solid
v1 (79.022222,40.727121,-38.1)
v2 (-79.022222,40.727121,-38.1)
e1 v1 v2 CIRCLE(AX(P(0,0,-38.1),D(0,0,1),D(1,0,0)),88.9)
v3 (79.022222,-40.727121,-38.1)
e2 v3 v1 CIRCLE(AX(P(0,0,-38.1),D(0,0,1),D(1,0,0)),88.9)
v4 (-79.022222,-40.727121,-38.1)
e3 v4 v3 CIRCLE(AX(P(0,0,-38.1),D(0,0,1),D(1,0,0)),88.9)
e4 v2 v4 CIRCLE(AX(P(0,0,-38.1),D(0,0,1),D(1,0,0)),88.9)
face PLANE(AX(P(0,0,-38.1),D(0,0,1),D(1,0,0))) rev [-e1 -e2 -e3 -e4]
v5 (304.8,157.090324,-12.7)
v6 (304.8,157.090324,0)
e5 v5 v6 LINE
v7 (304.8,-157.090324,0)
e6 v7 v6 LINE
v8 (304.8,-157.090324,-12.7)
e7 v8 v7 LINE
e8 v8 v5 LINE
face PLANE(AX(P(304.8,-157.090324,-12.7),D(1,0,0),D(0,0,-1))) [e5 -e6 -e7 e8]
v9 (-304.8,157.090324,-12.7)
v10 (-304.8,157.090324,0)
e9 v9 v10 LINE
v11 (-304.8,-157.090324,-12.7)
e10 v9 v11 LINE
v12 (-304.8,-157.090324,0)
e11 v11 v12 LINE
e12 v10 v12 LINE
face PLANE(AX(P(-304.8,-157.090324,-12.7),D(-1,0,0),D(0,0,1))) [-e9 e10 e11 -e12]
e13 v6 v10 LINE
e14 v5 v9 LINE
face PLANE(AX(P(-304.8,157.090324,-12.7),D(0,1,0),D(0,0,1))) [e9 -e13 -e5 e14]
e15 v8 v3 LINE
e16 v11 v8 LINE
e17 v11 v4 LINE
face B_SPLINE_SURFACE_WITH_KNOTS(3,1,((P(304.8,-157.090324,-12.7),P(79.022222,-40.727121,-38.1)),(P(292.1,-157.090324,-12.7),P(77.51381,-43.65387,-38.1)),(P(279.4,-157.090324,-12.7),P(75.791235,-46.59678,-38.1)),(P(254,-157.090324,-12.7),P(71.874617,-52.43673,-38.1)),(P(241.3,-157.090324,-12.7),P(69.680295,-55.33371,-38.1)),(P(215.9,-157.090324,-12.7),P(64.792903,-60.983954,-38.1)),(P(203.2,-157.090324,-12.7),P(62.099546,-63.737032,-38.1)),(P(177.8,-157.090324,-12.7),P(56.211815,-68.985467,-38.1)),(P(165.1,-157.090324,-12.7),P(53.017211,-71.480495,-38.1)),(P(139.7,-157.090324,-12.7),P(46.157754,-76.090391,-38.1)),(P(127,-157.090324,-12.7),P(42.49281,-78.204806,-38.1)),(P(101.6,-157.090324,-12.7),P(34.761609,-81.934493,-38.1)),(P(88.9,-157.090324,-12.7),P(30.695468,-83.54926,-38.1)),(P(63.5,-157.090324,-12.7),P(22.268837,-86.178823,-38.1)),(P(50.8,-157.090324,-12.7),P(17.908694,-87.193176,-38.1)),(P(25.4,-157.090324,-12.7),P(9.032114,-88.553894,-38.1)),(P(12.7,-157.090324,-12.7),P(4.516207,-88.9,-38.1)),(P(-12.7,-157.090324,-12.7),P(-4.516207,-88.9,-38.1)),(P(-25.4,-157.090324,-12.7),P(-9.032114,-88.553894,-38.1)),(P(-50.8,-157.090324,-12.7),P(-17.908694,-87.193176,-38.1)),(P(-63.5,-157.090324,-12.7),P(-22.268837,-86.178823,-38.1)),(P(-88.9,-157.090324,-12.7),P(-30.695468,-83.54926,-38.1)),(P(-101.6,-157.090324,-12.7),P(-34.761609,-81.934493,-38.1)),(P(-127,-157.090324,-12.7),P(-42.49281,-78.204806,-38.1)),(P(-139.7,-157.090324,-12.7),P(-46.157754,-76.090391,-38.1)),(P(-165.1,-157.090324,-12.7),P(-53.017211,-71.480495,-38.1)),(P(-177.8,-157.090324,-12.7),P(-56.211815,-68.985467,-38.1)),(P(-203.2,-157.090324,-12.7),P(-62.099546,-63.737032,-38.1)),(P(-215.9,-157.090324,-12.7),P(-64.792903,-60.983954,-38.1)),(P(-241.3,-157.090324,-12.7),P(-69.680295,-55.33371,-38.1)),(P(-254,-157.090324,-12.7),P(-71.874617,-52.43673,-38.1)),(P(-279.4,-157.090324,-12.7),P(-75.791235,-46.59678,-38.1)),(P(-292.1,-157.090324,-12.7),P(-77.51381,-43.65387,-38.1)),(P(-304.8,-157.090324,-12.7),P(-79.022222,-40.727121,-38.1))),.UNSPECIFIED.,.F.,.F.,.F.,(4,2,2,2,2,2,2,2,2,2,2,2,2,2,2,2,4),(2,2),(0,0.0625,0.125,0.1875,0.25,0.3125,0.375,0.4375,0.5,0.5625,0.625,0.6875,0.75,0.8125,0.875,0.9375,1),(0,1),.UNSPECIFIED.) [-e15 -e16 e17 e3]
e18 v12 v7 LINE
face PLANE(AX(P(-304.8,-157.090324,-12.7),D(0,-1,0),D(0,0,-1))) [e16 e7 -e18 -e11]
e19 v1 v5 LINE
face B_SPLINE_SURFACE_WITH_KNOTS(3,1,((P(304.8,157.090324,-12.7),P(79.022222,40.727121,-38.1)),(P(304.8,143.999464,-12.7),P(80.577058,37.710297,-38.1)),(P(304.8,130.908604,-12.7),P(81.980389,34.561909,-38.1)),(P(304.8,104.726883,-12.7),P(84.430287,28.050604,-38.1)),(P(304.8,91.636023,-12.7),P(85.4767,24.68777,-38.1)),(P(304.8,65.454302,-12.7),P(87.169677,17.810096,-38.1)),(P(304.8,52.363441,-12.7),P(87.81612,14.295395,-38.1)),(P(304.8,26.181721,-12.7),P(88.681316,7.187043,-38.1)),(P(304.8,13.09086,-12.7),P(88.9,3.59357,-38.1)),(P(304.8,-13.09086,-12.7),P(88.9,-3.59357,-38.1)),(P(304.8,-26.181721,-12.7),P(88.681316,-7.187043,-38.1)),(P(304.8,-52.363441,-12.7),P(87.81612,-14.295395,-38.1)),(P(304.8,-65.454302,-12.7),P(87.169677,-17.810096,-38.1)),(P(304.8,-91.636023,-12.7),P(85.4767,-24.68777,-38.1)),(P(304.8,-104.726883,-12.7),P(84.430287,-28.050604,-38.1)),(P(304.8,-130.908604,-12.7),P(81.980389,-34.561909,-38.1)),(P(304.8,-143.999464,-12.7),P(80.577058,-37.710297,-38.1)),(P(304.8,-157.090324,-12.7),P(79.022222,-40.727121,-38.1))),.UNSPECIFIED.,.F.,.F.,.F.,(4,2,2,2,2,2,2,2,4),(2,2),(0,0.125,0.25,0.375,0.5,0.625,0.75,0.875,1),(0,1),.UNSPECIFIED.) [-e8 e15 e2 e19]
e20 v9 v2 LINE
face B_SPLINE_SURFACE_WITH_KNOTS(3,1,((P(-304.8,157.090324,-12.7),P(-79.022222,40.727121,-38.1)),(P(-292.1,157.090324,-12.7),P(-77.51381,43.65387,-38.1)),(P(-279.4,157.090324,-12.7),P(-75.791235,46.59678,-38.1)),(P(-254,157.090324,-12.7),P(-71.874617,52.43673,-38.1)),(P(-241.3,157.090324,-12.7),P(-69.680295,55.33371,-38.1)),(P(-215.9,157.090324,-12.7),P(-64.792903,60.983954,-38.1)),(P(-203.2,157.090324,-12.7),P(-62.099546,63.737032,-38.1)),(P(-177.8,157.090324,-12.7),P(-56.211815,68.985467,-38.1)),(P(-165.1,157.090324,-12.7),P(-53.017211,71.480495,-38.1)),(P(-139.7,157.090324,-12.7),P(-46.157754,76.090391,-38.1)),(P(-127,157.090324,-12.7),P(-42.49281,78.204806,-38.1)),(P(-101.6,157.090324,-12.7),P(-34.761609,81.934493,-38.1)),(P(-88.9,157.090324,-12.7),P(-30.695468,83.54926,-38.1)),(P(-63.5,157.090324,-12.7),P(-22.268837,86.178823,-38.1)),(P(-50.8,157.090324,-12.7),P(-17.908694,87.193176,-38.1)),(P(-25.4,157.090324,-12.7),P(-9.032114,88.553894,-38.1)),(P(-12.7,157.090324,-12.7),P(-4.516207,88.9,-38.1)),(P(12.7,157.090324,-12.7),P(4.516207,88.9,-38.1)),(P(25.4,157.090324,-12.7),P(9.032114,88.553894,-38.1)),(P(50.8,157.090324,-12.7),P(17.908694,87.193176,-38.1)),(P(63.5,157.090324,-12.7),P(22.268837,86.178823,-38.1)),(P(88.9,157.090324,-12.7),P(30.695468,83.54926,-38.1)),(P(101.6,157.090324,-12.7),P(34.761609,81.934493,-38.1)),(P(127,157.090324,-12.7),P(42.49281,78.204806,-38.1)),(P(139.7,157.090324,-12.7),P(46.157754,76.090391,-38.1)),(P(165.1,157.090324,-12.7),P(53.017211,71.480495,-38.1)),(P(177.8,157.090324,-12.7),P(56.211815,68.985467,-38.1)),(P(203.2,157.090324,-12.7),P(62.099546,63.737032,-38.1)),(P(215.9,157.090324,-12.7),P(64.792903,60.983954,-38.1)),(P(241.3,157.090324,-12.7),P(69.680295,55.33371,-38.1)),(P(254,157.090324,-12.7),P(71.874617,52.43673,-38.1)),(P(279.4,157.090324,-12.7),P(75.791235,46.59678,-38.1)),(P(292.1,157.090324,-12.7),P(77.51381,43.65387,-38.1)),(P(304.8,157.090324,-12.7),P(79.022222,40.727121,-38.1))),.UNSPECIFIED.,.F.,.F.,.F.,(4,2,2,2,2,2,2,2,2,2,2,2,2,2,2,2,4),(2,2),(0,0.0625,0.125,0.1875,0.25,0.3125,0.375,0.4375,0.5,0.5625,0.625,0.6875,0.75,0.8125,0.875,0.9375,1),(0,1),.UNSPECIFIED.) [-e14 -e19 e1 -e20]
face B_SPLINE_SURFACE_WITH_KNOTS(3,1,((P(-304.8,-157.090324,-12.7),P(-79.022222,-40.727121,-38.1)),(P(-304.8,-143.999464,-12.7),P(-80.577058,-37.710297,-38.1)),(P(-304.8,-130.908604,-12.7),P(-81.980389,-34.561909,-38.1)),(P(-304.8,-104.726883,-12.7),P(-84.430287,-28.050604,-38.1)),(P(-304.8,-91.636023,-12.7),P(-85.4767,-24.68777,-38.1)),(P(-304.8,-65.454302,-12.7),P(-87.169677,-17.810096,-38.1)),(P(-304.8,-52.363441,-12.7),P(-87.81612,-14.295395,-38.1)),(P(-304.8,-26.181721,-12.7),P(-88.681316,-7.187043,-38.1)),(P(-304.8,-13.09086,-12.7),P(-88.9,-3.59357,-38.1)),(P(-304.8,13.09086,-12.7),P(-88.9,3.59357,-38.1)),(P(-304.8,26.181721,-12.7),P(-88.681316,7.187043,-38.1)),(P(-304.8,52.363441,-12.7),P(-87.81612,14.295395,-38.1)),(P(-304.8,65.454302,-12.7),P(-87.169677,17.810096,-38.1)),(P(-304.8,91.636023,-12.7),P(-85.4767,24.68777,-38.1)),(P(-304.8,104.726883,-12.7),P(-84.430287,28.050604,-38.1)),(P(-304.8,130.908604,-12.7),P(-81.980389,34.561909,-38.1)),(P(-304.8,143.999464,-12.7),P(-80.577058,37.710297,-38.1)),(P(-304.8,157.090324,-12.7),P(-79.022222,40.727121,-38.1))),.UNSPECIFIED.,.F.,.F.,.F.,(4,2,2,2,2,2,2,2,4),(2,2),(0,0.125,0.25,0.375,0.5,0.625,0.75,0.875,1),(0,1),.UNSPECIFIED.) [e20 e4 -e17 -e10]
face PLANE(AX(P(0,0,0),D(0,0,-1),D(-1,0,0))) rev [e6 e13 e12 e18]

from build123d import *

# Parameters (mm, degrees)
SKETCH1_W           = 609.6
SKETCH1_H           = 314.180648672
BOSS_EXTRUDE1_DEPTH = 12.7


with BuildPart() as part:
    # Sketch1 → Boss-Extrude1 (new body)
    with BuildSketch(Plane.XY):
        Rectangle(SKETCH1_W, SKETCH1_H)
    extrude(amount=-BOSS_EXTRUDE1_DEPTH)

    # Loft1: read off the stored shape, not the designer's step
    # Loft1: loft between two sections, ruled curve by curve
    loft1_from = [
        Edge.make_bspline([(304.8, 157.090324336, -12.7), (304.8, 143.999463975, -12.7), (304.8, 130.908603613, -12.7), (304.8, 104.726882891, -12.7), (304.8, 91.636022529, -12.7), (304.8, 65.454301807, -12.7), (304.8, 52.363441445, -12.7), (304.8, 26.181720723, -12.7), (304.8, 13.090860361, -12.7), (304.8, -13.090860361, -12.7), (304.8, -26.181720723, -12.7), (304.8, -52.363441445, -12.7), (304.8, -65.454301807, -12.7), (304.8, -91.636022529, -12.7), (304.8, -104.726882891, -12.7), (304.8, -130.908603613, -12.7), (304.8, -143.999463975, -12.7), (304.8, -157.090324336, -12.7)], [0, 0, 0, 0, 0.125, 0.125, 0.25, 0.25, 0.375, 0.375, 0.5, 0.5, 0.625, 0.625, 0.75, 0.75, 0.875, 0.875, 1, 1, 1, 1], 3),
        Edge.make_bspline([(304.8, -157.090324336, -12.7), (292.1, -157.090324336, -12.7), (279.4, -157.090324336, -12.7), (254, -157.090324336, -12.7), (241.3, -157.090324336, -12.7), (215.9, -157.090324336, -12.7), (203.2, -157.090324336, -12.7), (177.8, -157.090324336, -12.7), (165.1, -157.090324336, -12.7), (139.7, -157.090324336, -12.7), (127, -157.090324336, -12.7), (101.6, -157.090324336, -12.7), (88.9, -157.090324336, -12.7), (63.5, -157.090324336, -12.7), (50.8, -157.090324336, -12.7), (25.4, -157.090324336, -12.7), (12.7, -157.090324336, -12.7), (-12.7, -157.090324336, -12.7), (-25.4, -157.090324336, -12.7), (-50.8, -157.090324336, -12.7), (-63.5, -157.090324336, -12.7), (-88.9, -157.090324336, -12.7), (-101.6, -157.090324336, -12.7), (-127, -157.090324336, -12.7), (-139.7, -157.090324336, -12.7), (-165.1, -157.090324336, -12.7), (-177.8, -157.090324336, -12.7), (-203.2, -157.090324336, -12.7), (-215.9, -157.090324336, -12.7), (-241.3, -157.090324336, -12.7), (-254, -157.090324336, -12.7), (-279.4, -157.090324336, -12.7), (-292.1, -157.090324336, -12.7), (-304.8, -157.090324336, -12.7)], [0, 0, 0, 0, 0.0625, 0.0625, 0.125, 0.125, 0.1875, 0.1875, 0.25, 0.25, 0.3125, 0.3125, 0.375, 0.375, 0.4375, 0.4375, 0.5, 0.5, 0.5625, 0.5625, 0.625, 0.625, 0.6875, 0.6875, 0.75, 0.75, 0.8125, 0.8125, 0.875, 0.875, 0.9375, 0.9375, 1, 1, 1, 1], 3),
        Edge.make_bspline([(-304.8, 157.090324336, -12.7), (-292.1, 157.090324336, -12.7), (-279.4, 157.090324336, -12.7), (-254, 157.090324336, -12.7), (-241.3, 157.090324336, -12.7), (-215.9, 157.090324336, -12.7), (-203.2, 157.090324336, -12.7), (-177.8, 157.090324336, -12.7), (-165.1, 157.090324336, -12.7), (-139.7, 157.090324336, -12.7), (-127, 157.090324336, -12.7), (-101.6, 157.090324336, -12.7), (-88.9, 157.090324336, -12.7), (-63.5, 157.090324336, -12.7), (-50.8, 157.090324336, -12.7), (-25.4, 157.090324336, -12.7), (-12.7, 157.090324336, -12.7), (12.7, 157.090324336, -12.7), (25.4, 157.090324336, -12.7), (50.8, 157.090324336, -12.7), (63.5, 157.090324336, -12.7), (88.9, 157.090324336, -12.7), (101.6, 157.090324336, -12.7), (127, 157.090324336, -12.7), (139.7, 157.090324336, -12.7), (165.1, 157.090324336, -12.7), (177.8, 157.090324336, -12.7), (203.2, 157.090324336, -12.7), (215.9, 157.090324336, -12.7), (241.3, 157.090324336, -12.7), (254, 157.090324336, -12.7), (279.4, 157.090324336, -12.7), (292.1, 157.090324336, -12.7), (304.8, 157.090324336, -12.7)], [0, 0, 0, 0, 0.0625, 0.0625, 0.125, 0.125, 0.1875, 0.1875, 0.25, 0.25, 0.3125, 0.3125, 0.375, 0.375, 0.4375, 0.4375, 0.5, 0.5, 0.5625, 0.5625, 0.625, 0.625, 0.6875, 0.6875, 0.75, 0.75, 0.8125, 0.8125, 0.875, 0.875, 0.9375, 0.9375, 1, 1, 1, 1], 3),
        Edge.make_bspline([(-304.8, -157.090324336, -12.7), (-304.8, -143.999463975, -12.7), (-304.8, -130.908603613, -12.7), (-304.8, -104.726882891, -12.7), (-304.8, -91.636022529, -12.7), (-304.8, -65.454301807, -12.7), (-304.8, -52.363441445, -12.7), (-304.8, -26.181720723, -12.7), (-304.8, -13.090860361, -12.7), (-304.8, 13.090860361, -12.7), (-304.8, 26.181720723, -12.7), (-304.8, 52.363441445, -12.7), (-304.8, 65.454301807, -12.7), (-304.8, 91.636022529, -12.7), (-304.8, 104.726882891, -12.7), (-304.8, 130.908603613, -12.7), (-304.8, 143.999463975, -12.7), (-304.8, 157.090324336, -12.7)], [0, 0, 0, 0, 0.125, 0.125, 0.25, 0.25, 0.375, 0.375, 0.5, 0.5, 0.625, 0.625, 0.75, 0.75, 0.875, 0.875, 1, 1, 1, 1], 3),
    ]
    loft1_to = [
        Edge.make_bspline([(79.022222222, 40.727121124, -38.1), (80.577057613, 37.710297337, -38.1), (81.980389053, 34.561909453, -38.1), (84.430287104, 28.050604162, -38.1), (85.476699573, 24.687769705, -38.1), (87.169677239, 17.810095816, -38.1), (87.816120347, 14.295394928, -38.1), (88.681315551, 7.187042588, -38.1), (88.9, 3.593569511, -38.1), (88.9, -3.593569511, -38.1), (88.681315551, -7.187042588, -38.1), (87.816120347, -14.295394928, -38.1), (87.169677239, -17.810095816, -38.1), (85.476699573, -24.687769705, -38.1), (84.430287104, -28.050604162, -38.1), (81.980389053, -34.561909453, -38.1), (80.577057613, -37.710297337, -38.1), (79.022222222, -40.727121124, -38.1)], [0, 0, 0, 0, 0.125, 0.125, 0.25, 0.25, 0.375, 0.375, 0.5, 0.5, 0.625, 0.625, 0.75, 0.75, 0.875, 0.875, 1, 1, 1, 1], 3),
        Edge.make_bspline([(79.022222222, -40.727121124, -38.1), (77.513810329, -43.653870095, -38.1), (75.79123489, -46.596780367, -38.1), (71.874617054, -52.43672997, -38.1), (69.680294943, -55.333709982, -38.1), (64.792903277, -60.983954027, -38.1), (62.099546472, -63.737031565, -38.1), (56.211815103, -68.985467365, -38.1), (53.017211054, -71.480494923, -38.1), (46.157754062, -76.090390736, -38.1), (42.492809932, -78.204805568, -38.1), (34.761608604, -81.934492597, -38.1), (30.695467957, -83.549260467, -38.1), (22.268836934, -86.178823265, -38.1), (17.908694381, -87.193176196, -38.1), (9.032113746, -88.553894498, -38.1), (4.516207395, -88.9, -38.1), (-4.516207395, -88.9, -38.1), (-9.032113746, -88.553894498, -38.1), (-17.908694381, -87.193176196, -38.1), (-22.268836934, -86.178823265, -38.1), (-30.695467957, -83.549260467, -38.1), (-34.761608604, -81.934492597, -38.1), (-42.492809932, -78.204805568, -38.1), (-46.157754062, -76.090390736, -38.1), (-53.017211054, -71.480494923, -38.1), (-56.211815103, -68.985467365, -38.1), (-62.099546472, -63.737031565, -38.1), (-64.792903277, -60.983954027, -38.1), (-69.680294943, -55.333709982, -38.1), (-71.874617054, -52.43672997, -38.1), (-75.79123489, -46.596780367, -38.1), (-77.513810329, -43.653870095, -38.1), (-79.022222222, -40.727121124, -38.1)], [0, 0, 0, 0, 0.0625, 0.0625, 0.125, 0.125, 0.1875, 0.1875, 0.25, 0.25, 0.3125, 0.3125, 0.375, 0.375, 0.4375, 0.4375, 0.5, 0.5, 0.5625, 0.5625, 0.625, 0.625, 0.6875, 0.6875, 0.75, 0.75, 0.8125, 0.8125, 0.875, 0.875, 0.9375, 0.9375, 1, 1, 1, 1], 3),
        Edge.make_bspline([(-79.022222222, 40.727121124, -38.1), (-77.513810329, 43.653870095, -38.1), (-75.79123489, 46.596780367, -38.1), (-71.874617054, 52.43672997, -38.1), (-69.680294943, 55.333709982, -38.1), (-64.792903277, 60.983954027, -38.1), (-62.099546472, 63.737031565, -38.1), (-56.211815103, 68.985467365, -38.1), (-53.017211054, 71.480494923, -38.1), (-46.157754062, 76.090390736, -38.1), (-42.492809932, 78.204805568, -38.1), (-34.761608604, 81.934492597, -38.1), (-30.695467957, 83.549260467, -38.1), (-22.268836934, 86.178823265, -38.1), (-17.908694381, 87.193176196, -38.1), (-9.032113746, 88.553894498, -38.1), (-4.516207395, 88.9, -38.1), (4.516207395, 88.9, -38.1), (9.032113746, 88.553894498, -38.1), (17.908694381, 87.193176196, -38.1), (22.268836934, 86.178823265, -38.1), (30.695467957, 83.549260467, -38.1), (34.761608604, 81.934492597, -38.1), (42.492809932, 78.204805568, -38.1), (46.157754062, 76.090390736, -38.1), (53.017211054, 71.480494923, -38.1), (56.211815103, 68.985467365, -38.1), (62.099546472, 63.737031565, -38.1), (64.792903277, 60.983954027, -38.1), (69.680294943, 55.333709982, -38.1), (71.874617054, 52.43672997, -38.1), (75.79123489, 46.596780367, -38.1), (77.513810329, 43.653870095, -38.1), (79.022222222, 40.727121124, -38.1)], [0, 0, 0, 0, 0.0625, 0.0625, 0.125, 0.125, 0.1875, 0.1875, 0.25, 0.25, 0.3125, 0.3125, 0.375, 0.375, 0.4375, 0.4375, 0.5, 0.5, 0.5625, 0.5625, 0.625, 0.625, 0.6875, 0.6875, 0.75, 0.75, 0.8125, 0.8125, 0.875, 0.875, 0.9375, 0.9375, 1, 1, 1, 1], 3),
        Edge.make_bspline([(-79.022222222, -40.727121124, -38.1), (-80.577057613, -37.710297337, -38.1), (-81.980389053, -34.561909453, -38.1), (-84.430287104, -28.050604162, -38.1), (-85.476699573, -24.687769705, -38.1), (-87.169677239, -17.810095816, -38.1), (-87.816120347, -14.295394928, -38.1), (-88.681315551, -7.187042588, -38.1), (-88.9, -3.593569511, -38.1), (-88.9, 3.593569511, -38.1), (-88.681315551, 7.187042588, -38.1), (-87.816120347, 14.295394928, -38.1), (-87.169677239, 17.810095816, -38.1), (-85.476699573, 24.687769705, -38.1), (-84.430287104, 28.050604162, -38.1), (-81.980389053, 34.561909453, -38.1), (-80.577057613, 37.710297337, -38.1), (-79.022222222, 40.727121124, -38.1)], [0, 0, 0, 0, 0.125, 0.125, 0.25, 0.25, 0.375, 0.375, 0.5, 0.5, 0.625, 0.625, 0.75, 0.75, 0.875, 0.875, 1, 1, 1, 1], 3),
    ]
    loft1 = Solid(Shell([*[Face.make_surface_from_curves(loft1_from[k], loft1_to[k]) for k in range(4)], Face(Wire(loft1_from)), Face(Wire(loft1_to))]))
    add(loft1)


solid = part.part
